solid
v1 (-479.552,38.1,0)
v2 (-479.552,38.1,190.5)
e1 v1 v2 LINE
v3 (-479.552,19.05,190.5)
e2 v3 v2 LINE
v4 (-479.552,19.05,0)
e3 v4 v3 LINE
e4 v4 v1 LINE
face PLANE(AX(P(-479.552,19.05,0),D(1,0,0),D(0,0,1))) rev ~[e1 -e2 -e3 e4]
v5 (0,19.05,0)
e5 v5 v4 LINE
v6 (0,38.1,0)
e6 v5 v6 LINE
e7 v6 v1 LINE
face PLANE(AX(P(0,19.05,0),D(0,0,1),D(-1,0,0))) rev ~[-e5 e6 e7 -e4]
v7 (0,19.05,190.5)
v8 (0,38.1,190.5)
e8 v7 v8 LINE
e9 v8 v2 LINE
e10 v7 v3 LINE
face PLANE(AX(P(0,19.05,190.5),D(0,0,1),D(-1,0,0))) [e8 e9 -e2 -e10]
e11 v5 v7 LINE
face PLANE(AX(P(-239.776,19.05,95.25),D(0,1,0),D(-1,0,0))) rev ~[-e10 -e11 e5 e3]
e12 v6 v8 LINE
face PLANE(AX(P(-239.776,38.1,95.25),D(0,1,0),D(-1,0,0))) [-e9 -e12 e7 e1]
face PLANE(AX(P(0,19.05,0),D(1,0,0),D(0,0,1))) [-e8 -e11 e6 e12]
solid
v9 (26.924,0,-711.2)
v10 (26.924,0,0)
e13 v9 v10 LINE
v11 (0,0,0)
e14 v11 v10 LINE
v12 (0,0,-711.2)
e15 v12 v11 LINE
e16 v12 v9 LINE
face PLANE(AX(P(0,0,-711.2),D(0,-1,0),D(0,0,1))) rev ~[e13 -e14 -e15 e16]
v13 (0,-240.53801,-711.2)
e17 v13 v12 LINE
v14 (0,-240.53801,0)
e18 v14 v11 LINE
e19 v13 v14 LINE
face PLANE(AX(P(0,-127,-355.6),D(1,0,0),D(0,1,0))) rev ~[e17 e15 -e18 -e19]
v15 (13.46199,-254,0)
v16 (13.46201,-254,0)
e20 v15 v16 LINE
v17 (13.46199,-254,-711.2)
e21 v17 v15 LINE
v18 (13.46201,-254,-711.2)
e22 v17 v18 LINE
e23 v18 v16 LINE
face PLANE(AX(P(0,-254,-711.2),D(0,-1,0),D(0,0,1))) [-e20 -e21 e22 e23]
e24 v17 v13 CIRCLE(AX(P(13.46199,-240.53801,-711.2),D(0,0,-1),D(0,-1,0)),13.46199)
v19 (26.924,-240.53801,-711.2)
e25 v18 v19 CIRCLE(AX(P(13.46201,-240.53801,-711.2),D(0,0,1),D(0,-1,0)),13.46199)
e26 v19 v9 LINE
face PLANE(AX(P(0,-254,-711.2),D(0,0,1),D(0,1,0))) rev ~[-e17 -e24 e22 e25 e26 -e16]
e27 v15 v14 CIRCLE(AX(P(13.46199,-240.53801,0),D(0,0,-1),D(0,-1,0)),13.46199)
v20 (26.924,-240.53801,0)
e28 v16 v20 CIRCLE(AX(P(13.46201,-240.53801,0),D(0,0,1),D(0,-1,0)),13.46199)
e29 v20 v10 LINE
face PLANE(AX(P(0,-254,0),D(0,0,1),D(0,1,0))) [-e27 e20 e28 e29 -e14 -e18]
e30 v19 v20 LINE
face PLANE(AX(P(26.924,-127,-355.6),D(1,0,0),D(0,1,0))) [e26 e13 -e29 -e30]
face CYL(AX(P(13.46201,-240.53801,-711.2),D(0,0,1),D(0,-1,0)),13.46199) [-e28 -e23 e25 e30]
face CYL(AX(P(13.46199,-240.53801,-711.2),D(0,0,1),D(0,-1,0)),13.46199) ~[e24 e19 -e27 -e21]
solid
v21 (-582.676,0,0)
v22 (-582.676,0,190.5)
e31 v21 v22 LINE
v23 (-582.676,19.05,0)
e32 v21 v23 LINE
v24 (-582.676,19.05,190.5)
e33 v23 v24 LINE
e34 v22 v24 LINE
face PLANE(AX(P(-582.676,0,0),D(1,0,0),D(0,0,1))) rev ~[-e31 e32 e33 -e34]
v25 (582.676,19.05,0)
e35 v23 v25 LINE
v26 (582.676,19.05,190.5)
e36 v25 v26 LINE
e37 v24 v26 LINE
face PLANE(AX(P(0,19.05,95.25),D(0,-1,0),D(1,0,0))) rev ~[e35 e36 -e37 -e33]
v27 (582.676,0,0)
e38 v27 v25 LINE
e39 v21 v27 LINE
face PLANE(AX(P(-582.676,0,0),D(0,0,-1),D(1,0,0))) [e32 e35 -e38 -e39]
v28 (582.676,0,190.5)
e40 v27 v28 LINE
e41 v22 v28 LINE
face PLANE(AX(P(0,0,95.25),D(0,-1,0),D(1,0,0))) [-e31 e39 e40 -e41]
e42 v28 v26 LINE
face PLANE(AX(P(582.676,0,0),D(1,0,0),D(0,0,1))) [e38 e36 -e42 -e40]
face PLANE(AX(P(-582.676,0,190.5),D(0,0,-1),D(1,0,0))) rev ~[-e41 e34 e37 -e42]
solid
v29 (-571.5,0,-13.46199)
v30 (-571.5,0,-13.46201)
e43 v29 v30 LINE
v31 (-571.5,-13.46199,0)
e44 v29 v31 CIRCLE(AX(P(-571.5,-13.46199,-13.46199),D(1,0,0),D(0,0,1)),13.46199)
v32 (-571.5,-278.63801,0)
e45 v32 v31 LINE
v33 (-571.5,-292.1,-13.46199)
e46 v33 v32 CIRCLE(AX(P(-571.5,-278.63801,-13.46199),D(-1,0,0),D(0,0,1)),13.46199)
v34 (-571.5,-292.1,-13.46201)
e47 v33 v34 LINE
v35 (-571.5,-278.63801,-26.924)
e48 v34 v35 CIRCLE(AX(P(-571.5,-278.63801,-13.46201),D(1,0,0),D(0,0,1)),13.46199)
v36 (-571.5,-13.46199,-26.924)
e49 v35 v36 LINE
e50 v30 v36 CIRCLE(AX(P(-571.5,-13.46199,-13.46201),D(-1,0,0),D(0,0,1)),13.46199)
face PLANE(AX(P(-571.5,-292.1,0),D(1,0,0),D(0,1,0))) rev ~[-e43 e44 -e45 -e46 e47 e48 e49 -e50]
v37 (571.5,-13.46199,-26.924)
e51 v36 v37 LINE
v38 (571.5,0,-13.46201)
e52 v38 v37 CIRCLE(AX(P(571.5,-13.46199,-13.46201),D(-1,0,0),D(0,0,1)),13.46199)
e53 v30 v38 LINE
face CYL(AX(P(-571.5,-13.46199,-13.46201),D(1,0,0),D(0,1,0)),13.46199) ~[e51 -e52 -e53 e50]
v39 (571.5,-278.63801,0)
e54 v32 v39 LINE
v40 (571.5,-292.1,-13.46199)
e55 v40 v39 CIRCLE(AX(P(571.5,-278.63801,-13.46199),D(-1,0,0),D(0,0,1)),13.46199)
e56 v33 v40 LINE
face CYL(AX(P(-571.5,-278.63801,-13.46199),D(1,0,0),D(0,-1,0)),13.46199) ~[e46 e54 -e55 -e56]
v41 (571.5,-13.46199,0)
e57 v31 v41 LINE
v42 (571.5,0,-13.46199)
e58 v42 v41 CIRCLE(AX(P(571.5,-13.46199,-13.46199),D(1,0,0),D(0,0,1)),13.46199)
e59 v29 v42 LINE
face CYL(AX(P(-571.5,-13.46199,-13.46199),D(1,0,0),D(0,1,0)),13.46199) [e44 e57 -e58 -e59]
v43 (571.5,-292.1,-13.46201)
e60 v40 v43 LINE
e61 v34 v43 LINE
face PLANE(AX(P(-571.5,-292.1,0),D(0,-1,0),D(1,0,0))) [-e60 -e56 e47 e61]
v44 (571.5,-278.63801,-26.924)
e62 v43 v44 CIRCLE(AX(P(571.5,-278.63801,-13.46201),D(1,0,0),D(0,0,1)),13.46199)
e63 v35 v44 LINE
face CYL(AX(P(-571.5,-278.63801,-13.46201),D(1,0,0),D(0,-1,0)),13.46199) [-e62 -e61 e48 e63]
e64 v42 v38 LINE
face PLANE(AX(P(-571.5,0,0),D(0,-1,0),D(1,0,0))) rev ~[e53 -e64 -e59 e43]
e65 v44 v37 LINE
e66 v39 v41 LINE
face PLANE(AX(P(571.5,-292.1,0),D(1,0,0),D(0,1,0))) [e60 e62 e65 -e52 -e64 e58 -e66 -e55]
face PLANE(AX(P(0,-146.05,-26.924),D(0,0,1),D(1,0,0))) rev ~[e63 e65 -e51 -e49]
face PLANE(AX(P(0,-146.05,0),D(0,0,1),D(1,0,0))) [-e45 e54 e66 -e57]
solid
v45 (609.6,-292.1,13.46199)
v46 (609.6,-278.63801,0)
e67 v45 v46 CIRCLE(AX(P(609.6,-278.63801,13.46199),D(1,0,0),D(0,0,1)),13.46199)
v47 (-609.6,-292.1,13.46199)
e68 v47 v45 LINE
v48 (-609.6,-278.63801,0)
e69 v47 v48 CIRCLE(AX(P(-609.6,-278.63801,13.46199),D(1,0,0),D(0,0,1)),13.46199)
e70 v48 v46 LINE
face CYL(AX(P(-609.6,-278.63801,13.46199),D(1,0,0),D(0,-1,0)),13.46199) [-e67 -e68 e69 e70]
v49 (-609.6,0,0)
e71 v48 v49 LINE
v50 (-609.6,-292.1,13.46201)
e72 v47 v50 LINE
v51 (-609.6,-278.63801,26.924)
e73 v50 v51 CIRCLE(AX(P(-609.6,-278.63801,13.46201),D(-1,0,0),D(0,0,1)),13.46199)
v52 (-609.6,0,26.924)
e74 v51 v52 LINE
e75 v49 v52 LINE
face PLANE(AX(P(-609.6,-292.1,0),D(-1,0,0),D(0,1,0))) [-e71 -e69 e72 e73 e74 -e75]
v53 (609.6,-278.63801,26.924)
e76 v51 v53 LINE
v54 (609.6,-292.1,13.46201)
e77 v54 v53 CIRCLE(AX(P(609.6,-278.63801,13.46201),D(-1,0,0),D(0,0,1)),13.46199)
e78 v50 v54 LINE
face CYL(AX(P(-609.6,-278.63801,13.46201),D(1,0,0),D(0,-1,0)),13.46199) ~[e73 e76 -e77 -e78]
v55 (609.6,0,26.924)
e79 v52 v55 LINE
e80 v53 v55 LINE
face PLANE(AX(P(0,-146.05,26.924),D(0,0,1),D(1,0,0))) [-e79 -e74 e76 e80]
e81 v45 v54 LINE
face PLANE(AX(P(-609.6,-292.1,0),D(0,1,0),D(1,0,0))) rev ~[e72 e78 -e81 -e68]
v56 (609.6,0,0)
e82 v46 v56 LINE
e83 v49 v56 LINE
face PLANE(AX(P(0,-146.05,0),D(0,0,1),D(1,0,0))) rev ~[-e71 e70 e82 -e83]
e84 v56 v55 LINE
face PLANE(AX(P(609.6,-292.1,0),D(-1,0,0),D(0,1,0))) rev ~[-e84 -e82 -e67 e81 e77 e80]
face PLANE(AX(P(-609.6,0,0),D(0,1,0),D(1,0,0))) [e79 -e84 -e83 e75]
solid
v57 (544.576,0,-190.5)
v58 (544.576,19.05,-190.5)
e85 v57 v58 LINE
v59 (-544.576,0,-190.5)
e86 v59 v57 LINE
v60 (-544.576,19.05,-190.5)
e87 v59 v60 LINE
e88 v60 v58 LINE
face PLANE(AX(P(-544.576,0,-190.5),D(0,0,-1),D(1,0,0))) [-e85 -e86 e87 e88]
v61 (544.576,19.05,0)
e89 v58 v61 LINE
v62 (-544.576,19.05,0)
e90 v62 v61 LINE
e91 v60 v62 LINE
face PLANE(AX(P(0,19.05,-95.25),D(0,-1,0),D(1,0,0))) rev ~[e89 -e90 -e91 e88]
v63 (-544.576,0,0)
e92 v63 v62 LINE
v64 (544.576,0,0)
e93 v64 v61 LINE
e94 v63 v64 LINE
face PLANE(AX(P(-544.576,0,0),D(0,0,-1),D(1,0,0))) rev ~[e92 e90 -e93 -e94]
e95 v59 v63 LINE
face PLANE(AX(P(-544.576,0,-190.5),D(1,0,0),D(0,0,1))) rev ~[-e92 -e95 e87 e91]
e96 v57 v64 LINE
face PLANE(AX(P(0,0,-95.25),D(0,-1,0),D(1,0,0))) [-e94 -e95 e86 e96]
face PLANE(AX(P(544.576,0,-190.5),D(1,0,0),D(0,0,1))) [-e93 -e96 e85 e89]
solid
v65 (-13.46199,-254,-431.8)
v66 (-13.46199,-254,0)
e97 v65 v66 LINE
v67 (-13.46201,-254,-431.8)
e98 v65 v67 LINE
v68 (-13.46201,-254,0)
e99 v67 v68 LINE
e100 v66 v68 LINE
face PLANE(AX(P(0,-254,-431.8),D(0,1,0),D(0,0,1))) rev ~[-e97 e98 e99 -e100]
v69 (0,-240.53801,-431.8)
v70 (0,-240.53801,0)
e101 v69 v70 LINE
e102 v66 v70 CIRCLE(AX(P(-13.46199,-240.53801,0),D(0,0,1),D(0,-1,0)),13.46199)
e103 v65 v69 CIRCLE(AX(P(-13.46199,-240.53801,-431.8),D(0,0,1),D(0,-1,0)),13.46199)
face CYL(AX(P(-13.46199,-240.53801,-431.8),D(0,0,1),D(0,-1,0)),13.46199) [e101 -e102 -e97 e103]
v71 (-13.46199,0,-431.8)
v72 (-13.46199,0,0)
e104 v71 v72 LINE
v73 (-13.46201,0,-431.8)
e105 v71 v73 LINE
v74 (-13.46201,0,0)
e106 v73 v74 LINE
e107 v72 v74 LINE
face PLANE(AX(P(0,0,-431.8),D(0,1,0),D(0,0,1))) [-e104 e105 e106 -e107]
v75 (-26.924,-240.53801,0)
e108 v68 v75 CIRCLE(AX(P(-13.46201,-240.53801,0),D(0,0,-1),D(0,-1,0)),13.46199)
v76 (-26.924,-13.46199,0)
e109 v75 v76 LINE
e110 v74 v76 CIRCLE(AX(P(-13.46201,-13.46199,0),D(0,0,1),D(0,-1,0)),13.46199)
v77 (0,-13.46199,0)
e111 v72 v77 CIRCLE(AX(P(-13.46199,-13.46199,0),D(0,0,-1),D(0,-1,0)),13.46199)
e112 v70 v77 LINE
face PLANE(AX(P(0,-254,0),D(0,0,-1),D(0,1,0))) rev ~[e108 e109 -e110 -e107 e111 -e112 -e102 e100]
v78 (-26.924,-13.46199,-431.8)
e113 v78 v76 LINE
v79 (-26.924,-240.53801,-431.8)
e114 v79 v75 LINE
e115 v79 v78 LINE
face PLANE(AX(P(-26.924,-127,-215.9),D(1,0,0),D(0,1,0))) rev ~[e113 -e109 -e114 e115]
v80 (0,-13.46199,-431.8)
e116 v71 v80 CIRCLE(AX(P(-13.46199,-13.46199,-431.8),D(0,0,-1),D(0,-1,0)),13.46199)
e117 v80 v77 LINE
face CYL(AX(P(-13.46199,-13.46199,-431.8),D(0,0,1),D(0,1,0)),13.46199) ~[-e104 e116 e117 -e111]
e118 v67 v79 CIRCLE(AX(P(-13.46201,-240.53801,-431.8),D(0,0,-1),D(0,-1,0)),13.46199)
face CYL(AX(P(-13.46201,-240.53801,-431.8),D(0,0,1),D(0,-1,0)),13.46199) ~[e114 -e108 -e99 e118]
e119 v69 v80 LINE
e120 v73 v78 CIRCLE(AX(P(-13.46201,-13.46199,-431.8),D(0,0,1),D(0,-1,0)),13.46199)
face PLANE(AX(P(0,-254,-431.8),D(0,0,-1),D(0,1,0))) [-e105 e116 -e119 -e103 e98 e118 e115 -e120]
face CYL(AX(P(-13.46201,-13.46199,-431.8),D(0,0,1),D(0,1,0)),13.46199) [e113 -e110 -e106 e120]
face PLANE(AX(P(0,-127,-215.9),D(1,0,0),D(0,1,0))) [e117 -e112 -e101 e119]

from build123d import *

# Parameters (mm, degrees)
F0_W      = 1219.2
F0_H      = 292.1
F1_DEPTH  = 26.924
F2_R      = 13.46199
F3_W      = 1165.352
F3_H      = 190.5
F4_DEPTH  = 19.05
F5_W      = 254
F5_H      = 711.2
F6_DEPTH  = 26.924
F7_W      = 254
F7_H      = 431.8
F8_DEPTH  = 26.924
F9_R      = 13.46199
F10_R     = 13.46199
F11_W     = 1143
F11_H     = 292.1
F12_DEPTH = 26.924
F13_R     = 13.46199
F14_W     = 1089.152
F14_H     = 190.5
F15_DEPTH = 19.05
F16_W     = 479.552
F16_H     = 190.5
F17_DEPTH = 19.05


# Not quite as in the source:
# - a fillet or chamfer is up to 0.001 mm smaller than in the source, because OpenCascade refuses the exact size


with BuildPart() as f1:
    # F0 (on Top) → F1 (new body)
    with BuildSketch(Plane.XY):
        with Locations((0, -146.05)):
            Rectangle(F0_W, F0_H)
    extrude(amount=F1_DEPTH)

    # F2 (radius 13.462 in the source; OpenCascade refuses exactly that, so slightly less here)
    f2_edges = [f1.edges().sort_by_distance(p)[0] for p in [
        (0, -292.1, 26.924),
        (0, -292.1, 0),
    ]]
    fillet(f2_edges, radius=F2_R)


with BuildPart() as f4:
    # F3 (on Front) → F4 (new body)
    with BuildSketch(Plane.XZ):
        with Locations((0, 95.25)):
            Rectangle(F3_W, F3_H)
    extrude(amount=-F4_DEPTH)


with BuildPart() as f6:
    # F5 (on Right) → F6 (new body)
    with BuildSketch(Plane.YZ):
        with Locations((-127, -355.6)):
            Rectangle(F5_W, F5_H)
    extrude(amount=F6_DEPTH)

    # F9 (radius 13.462 in the source; OpenCascade refuses exactly that, so slightly less here)
    f9_edges = [f6.edges().sort_by_distance(p)[0] for p in [
        (0, -254, -355.6),
        (26.924, -254, -355.6),
    ]]
    fillet(f9_edges, radius=F9_R)


with BuildPart() as f8:
    # F7 (on Right) → F8 (new body)
    with BuildSketch(Plane.YZ):
        with Locations((-127, -215.9)):
            Rectangle(F7_W, F7_H)
    extrude(amount=-F8_DEPTH)

    # F10 (radius 13.462 in the source; OpenCascade refuses exactly that, so slightly less here)
    f10_edges = [f8.edges().sort_by_distance(p)[0] for p in [
        (-26.924, -254, -215.9),
        (0, -254, -215.9),
        (-26.924, 0, -215.9),
        (0, 0, -215.9),
    ]]
    fillet(f10_edges, radius=F10_R)


with BuildPart() as f12:
    # F11 (on Top) → F12 (new body)
    with BuildSketch(Plane.XY):
        with Locations((0, -146.05)):
            Rectangle(F11_W, F11_H)
    extrude(amount=-F12_DEPTH)

    # F13 (radius 13.462 in the source; OpenCascade refuses exactly that, so slightly less here)
    f13_edges = [f12.edges().sort_by_distance(p)[0] for p in [
        (0, -292.1, 0),
        (0, -292.1, -26.924),
        (0, 0, -26.924),
        (0, 0, 0),
    ]]
    fillet(f13_edges, radius=F13_R)


with BuildPart() as f15:
    # F14 (on Front) → F15 (new body)
    with BuildSketch(Plane.XZ):
        with Locations((0, -95.25)):
            Rectangle(F14_W, F14_H)
    extrude(amount=-F15_DEPTH)


with BuildPart() as f17:
    # F16 (on face) → F17 (new body)
    with BuildSketch(Plane(origin=(0, 19.05, 0), x_dir=(-1, 0, 0), z_dir=(0, 1, 0))):
        with Locations((239.776, 95.25)):
            Rectangle(F16_W, F16_H)
    extrude(amount=F17_DEPTH)


solid = Compound([f1.part, f4.part, f6.part, f8.part, f12.part, f15.part, f17.part])
